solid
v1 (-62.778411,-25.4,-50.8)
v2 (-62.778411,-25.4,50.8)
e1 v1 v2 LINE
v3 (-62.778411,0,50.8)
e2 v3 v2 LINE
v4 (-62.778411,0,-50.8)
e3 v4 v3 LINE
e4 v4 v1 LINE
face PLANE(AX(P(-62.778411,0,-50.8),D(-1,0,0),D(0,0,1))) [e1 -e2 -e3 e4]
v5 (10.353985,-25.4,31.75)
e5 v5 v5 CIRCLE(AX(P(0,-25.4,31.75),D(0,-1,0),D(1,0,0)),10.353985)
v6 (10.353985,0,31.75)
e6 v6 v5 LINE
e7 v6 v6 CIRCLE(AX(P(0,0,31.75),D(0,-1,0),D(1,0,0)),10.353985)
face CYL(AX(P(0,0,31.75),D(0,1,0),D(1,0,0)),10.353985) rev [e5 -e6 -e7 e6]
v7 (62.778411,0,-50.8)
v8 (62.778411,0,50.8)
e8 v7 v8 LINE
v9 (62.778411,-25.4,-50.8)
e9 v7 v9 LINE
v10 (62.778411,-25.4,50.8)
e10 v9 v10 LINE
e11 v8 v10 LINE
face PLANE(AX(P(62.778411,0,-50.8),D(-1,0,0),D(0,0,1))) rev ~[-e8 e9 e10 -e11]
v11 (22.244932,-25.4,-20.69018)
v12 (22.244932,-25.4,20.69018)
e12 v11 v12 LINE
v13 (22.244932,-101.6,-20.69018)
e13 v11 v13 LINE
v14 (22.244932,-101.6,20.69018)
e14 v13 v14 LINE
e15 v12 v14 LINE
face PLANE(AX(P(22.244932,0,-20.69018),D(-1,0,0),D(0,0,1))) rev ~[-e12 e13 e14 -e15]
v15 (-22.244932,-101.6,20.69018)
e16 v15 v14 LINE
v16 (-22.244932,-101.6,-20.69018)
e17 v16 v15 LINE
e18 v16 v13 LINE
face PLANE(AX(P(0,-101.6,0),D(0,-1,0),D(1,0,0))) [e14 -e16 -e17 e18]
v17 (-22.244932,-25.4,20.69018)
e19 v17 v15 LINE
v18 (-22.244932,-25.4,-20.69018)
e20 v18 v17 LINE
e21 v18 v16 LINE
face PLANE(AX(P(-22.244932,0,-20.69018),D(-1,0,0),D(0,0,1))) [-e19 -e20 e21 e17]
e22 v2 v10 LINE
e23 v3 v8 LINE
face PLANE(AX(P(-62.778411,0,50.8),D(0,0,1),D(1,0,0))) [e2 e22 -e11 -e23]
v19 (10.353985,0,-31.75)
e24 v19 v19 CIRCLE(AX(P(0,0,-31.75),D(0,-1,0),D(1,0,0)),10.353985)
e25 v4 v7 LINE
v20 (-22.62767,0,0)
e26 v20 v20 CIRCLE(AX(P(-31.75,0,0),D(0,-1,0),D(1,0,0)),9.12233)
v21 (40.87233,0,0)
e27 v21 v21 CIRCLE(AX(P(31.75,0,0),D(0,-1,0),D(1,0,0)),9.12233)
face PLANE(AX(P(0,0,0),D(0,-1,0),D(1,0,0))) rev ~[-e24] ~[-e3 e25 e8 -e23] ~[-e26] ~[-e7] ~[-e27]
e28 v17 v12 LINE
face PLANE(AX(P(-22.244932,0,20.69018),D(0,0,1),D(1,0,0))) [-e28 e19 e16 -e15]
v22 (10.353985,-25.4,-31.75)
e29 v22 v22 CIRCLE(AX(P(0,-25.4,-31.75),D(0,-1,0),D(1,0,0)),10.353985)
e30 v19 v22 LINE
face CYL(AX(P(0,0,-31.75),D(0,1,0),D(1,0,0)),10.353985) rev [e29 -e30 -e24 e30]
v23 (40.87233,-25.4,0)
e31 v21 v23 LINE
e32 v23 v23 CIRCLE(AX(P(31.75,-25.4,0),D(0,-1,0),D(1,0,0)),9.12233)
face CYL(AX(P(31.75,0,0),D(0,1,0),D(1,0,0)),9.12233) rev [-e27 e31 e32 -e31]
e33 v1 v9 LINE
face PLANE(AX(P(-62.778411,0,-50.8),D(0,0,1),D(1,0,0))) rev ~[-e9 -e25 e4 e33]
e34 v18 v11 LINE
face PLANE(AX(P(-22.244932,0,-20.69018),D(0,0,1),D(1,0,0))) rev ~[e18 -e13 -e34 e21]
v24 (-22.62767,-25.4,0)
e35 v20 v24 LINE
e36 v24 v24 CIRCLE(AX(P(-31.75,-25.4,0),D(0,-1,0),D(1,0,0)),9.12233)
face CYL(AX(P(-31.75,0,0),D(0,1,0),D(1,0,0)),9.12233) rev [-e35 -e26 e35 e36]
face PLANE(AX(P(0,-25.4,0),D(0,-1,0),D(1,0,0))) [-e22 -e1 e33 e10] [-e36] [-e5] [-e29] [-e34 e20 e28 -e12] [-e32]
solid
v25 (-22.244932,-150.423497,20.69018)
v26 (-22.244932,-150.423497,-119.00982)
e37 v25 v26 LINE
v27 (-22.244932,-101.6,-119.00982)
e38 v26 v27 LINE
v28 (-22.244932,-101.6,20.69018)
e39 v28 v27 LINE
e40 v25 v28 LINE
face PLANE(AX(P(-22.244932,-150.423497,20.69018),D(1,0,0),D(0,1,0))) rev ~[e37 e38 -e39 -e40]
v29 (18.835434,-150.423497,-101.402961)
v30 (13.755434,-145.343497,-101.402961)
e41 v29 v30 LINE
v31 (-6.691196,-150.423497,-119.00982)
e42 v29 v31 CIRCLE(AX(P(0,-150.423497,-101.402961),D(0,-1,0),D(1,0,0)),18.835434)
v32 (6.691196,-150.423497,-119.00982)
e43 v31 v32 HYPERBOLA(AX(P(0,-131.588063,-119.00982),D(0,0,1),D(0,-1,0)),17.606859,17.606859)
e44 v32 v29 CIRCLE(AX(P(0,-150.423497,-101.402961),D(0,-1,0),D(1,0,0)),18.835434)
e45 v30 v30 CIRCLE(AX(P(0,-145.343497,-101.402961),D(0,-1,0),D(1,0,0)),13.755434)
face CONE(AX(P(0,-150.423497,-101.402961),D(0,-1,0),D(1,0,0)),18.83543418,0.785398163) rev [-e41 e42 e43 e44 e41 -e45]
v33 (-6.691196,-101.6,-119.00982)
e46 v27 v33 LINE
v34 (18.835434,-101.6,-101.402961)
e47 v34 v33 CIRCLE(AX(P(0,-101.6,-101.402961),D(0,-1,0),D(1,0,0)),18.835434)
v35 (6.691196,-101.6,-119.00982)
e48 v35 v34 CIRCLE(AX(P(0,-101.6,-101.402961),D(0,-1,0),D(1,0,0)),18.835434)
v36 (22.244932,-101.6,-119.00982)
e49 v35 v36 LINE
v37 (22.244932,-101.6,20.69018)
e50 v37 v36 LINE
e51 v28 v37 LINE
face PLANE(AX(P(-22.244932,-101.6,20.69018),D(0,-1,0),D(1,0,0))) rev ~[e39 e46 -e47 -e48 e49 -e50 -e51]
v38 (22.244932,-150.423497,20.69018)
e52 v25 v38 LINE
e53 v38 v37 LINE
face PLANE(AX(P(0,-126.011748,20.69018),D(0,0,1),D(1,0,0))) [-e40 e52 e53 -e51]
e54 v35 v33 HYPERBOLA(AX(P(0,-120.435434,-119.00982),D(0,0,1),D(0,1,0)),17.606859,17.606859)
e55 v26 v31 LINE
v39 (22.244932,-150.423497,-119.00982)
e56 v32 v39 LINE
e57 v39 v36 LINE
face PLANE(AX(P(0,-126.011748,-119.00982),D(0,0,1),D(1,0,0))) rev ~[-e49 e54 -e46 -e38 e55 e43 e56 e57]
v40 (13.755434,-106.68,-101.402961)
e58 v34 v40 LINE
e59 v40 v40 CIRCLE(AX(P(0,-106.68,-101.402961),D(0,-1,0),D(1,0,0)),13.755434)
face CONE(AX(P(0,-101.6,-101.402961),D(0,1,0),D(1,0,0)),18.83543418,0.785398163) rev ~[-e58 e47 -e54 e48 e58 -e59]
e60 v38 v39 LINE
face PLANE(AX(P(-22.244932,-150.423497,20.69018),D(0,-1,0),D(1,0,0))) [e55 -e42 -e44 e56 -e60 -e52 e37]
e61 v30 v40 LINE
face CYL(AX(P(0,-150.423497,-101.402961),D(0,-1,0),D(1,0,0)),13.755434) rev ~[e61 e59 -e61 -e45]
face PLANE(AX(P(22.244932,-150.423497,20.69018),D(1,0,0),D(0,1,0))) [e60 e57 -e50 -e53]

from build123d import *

# Parameters (mm, degrees)
F0_W     = 125.5568219279
F0_H     = 101.6
F0_R     = 9.122330494
F0_R_2   = 10.3539850451
F0_W_2   = 44.48986426
F0_H_2   = 41.3803607225
F1_DEPTH = 25.4
F2_DEPTH = 101.6
F3_W     = 44.48986426
F3_H     = 48.8234969616
F4_DEPTH = 139.7
F5_R     = 13.7554341803
F6_DEPTH = 150.4244969616


# Not quite as in the source:
# - a fillet or chamfer that OpenCascade refuses, or shapes differently, is made with other operations: its cross-section is extruded or revolved along the edge and cut away or added


with BuildPart() as f1:
    # F0 (on Front) → F1 (new body)
    with BuildSketch(Plane.XZ):
        Rectangle(F0_W, F0_H)
        with Locations((-31.75, 0)):
            Circle(F0_R, mode=Mode.SUBTRACT)
        with Locations((0, -31.75)):
            Circle(F0_R_2, mode=Mode.SUBTRACT)
        Rectangle(F0_W_2, F0_H_2, mode=Mode.SUBTRACT)
        with Locations((31.75, 0)):
            Circle(F0_R, mode=Mode.SUBTRACT)
        with Locations((0, 31.75)):
            Circle(F0_R_2, mode=Mode.SUBTRACT)
    extrude(amount=F1_DEPTH)

    # F0 (on Front) → F2 (join)
    with BuildSketch(Plane.XZ):
        Rectangle(F0_W_2, F0_H_2)
    extrude(amount=F2_DEPTH)


with BuildPart() as f4:
    # F3 (on face) → F4 (new body)
    with BuildSketch(Plane.XY.offset(20.6901803613)):
        with Locations((0, -126.0117484808)):
            Rectangle(F3_W, F3_H)
    extrude(amount=-F4_DEPTH)

    # F5 (on face) → F6 (cut, through all)
    with BuildSketch(Plane.XZ.offset(150.4234969616)):
        with Locations((0, -101.4029607177)):
            Circle(F5_R)
    extrude(amount=-F6_DEPTH, mode=Mode.SUBTRACT)

    # F7: chamfer of 5.08 on 3 edges, made by hand

    # F7_s1 → F7_t2 (revolve, cut)
    with BuildSketch(Plane.XY.offset(-101.4029607177)):
        Polygon((18.8354341803, -150.4234969616), (13.7554341803, -145.3434969616), (13.7554341803, -150.4234969616), align=None)
    revolve(axis=Axis((0, -150.4234969616, -101.4029607177), (0, -1, 0)), mode=Mode.SUBTRACT)

    # F7_s3 → F7_t4 (revolve, cut)
    with BuildSketch(Plane.XY.offset(-101.4029607177)):
        Polygon((18.8354341803, -101.6), (13.7554341803, -106.68), (13.7554341803, -101.6), align=None)
    revolve(axis=Axis((0, -101.6, -101.4029607177), (0, -1, 0)), mode=Mode.SUBTRACT)


solid = Compound([f1.part, f4.part])
